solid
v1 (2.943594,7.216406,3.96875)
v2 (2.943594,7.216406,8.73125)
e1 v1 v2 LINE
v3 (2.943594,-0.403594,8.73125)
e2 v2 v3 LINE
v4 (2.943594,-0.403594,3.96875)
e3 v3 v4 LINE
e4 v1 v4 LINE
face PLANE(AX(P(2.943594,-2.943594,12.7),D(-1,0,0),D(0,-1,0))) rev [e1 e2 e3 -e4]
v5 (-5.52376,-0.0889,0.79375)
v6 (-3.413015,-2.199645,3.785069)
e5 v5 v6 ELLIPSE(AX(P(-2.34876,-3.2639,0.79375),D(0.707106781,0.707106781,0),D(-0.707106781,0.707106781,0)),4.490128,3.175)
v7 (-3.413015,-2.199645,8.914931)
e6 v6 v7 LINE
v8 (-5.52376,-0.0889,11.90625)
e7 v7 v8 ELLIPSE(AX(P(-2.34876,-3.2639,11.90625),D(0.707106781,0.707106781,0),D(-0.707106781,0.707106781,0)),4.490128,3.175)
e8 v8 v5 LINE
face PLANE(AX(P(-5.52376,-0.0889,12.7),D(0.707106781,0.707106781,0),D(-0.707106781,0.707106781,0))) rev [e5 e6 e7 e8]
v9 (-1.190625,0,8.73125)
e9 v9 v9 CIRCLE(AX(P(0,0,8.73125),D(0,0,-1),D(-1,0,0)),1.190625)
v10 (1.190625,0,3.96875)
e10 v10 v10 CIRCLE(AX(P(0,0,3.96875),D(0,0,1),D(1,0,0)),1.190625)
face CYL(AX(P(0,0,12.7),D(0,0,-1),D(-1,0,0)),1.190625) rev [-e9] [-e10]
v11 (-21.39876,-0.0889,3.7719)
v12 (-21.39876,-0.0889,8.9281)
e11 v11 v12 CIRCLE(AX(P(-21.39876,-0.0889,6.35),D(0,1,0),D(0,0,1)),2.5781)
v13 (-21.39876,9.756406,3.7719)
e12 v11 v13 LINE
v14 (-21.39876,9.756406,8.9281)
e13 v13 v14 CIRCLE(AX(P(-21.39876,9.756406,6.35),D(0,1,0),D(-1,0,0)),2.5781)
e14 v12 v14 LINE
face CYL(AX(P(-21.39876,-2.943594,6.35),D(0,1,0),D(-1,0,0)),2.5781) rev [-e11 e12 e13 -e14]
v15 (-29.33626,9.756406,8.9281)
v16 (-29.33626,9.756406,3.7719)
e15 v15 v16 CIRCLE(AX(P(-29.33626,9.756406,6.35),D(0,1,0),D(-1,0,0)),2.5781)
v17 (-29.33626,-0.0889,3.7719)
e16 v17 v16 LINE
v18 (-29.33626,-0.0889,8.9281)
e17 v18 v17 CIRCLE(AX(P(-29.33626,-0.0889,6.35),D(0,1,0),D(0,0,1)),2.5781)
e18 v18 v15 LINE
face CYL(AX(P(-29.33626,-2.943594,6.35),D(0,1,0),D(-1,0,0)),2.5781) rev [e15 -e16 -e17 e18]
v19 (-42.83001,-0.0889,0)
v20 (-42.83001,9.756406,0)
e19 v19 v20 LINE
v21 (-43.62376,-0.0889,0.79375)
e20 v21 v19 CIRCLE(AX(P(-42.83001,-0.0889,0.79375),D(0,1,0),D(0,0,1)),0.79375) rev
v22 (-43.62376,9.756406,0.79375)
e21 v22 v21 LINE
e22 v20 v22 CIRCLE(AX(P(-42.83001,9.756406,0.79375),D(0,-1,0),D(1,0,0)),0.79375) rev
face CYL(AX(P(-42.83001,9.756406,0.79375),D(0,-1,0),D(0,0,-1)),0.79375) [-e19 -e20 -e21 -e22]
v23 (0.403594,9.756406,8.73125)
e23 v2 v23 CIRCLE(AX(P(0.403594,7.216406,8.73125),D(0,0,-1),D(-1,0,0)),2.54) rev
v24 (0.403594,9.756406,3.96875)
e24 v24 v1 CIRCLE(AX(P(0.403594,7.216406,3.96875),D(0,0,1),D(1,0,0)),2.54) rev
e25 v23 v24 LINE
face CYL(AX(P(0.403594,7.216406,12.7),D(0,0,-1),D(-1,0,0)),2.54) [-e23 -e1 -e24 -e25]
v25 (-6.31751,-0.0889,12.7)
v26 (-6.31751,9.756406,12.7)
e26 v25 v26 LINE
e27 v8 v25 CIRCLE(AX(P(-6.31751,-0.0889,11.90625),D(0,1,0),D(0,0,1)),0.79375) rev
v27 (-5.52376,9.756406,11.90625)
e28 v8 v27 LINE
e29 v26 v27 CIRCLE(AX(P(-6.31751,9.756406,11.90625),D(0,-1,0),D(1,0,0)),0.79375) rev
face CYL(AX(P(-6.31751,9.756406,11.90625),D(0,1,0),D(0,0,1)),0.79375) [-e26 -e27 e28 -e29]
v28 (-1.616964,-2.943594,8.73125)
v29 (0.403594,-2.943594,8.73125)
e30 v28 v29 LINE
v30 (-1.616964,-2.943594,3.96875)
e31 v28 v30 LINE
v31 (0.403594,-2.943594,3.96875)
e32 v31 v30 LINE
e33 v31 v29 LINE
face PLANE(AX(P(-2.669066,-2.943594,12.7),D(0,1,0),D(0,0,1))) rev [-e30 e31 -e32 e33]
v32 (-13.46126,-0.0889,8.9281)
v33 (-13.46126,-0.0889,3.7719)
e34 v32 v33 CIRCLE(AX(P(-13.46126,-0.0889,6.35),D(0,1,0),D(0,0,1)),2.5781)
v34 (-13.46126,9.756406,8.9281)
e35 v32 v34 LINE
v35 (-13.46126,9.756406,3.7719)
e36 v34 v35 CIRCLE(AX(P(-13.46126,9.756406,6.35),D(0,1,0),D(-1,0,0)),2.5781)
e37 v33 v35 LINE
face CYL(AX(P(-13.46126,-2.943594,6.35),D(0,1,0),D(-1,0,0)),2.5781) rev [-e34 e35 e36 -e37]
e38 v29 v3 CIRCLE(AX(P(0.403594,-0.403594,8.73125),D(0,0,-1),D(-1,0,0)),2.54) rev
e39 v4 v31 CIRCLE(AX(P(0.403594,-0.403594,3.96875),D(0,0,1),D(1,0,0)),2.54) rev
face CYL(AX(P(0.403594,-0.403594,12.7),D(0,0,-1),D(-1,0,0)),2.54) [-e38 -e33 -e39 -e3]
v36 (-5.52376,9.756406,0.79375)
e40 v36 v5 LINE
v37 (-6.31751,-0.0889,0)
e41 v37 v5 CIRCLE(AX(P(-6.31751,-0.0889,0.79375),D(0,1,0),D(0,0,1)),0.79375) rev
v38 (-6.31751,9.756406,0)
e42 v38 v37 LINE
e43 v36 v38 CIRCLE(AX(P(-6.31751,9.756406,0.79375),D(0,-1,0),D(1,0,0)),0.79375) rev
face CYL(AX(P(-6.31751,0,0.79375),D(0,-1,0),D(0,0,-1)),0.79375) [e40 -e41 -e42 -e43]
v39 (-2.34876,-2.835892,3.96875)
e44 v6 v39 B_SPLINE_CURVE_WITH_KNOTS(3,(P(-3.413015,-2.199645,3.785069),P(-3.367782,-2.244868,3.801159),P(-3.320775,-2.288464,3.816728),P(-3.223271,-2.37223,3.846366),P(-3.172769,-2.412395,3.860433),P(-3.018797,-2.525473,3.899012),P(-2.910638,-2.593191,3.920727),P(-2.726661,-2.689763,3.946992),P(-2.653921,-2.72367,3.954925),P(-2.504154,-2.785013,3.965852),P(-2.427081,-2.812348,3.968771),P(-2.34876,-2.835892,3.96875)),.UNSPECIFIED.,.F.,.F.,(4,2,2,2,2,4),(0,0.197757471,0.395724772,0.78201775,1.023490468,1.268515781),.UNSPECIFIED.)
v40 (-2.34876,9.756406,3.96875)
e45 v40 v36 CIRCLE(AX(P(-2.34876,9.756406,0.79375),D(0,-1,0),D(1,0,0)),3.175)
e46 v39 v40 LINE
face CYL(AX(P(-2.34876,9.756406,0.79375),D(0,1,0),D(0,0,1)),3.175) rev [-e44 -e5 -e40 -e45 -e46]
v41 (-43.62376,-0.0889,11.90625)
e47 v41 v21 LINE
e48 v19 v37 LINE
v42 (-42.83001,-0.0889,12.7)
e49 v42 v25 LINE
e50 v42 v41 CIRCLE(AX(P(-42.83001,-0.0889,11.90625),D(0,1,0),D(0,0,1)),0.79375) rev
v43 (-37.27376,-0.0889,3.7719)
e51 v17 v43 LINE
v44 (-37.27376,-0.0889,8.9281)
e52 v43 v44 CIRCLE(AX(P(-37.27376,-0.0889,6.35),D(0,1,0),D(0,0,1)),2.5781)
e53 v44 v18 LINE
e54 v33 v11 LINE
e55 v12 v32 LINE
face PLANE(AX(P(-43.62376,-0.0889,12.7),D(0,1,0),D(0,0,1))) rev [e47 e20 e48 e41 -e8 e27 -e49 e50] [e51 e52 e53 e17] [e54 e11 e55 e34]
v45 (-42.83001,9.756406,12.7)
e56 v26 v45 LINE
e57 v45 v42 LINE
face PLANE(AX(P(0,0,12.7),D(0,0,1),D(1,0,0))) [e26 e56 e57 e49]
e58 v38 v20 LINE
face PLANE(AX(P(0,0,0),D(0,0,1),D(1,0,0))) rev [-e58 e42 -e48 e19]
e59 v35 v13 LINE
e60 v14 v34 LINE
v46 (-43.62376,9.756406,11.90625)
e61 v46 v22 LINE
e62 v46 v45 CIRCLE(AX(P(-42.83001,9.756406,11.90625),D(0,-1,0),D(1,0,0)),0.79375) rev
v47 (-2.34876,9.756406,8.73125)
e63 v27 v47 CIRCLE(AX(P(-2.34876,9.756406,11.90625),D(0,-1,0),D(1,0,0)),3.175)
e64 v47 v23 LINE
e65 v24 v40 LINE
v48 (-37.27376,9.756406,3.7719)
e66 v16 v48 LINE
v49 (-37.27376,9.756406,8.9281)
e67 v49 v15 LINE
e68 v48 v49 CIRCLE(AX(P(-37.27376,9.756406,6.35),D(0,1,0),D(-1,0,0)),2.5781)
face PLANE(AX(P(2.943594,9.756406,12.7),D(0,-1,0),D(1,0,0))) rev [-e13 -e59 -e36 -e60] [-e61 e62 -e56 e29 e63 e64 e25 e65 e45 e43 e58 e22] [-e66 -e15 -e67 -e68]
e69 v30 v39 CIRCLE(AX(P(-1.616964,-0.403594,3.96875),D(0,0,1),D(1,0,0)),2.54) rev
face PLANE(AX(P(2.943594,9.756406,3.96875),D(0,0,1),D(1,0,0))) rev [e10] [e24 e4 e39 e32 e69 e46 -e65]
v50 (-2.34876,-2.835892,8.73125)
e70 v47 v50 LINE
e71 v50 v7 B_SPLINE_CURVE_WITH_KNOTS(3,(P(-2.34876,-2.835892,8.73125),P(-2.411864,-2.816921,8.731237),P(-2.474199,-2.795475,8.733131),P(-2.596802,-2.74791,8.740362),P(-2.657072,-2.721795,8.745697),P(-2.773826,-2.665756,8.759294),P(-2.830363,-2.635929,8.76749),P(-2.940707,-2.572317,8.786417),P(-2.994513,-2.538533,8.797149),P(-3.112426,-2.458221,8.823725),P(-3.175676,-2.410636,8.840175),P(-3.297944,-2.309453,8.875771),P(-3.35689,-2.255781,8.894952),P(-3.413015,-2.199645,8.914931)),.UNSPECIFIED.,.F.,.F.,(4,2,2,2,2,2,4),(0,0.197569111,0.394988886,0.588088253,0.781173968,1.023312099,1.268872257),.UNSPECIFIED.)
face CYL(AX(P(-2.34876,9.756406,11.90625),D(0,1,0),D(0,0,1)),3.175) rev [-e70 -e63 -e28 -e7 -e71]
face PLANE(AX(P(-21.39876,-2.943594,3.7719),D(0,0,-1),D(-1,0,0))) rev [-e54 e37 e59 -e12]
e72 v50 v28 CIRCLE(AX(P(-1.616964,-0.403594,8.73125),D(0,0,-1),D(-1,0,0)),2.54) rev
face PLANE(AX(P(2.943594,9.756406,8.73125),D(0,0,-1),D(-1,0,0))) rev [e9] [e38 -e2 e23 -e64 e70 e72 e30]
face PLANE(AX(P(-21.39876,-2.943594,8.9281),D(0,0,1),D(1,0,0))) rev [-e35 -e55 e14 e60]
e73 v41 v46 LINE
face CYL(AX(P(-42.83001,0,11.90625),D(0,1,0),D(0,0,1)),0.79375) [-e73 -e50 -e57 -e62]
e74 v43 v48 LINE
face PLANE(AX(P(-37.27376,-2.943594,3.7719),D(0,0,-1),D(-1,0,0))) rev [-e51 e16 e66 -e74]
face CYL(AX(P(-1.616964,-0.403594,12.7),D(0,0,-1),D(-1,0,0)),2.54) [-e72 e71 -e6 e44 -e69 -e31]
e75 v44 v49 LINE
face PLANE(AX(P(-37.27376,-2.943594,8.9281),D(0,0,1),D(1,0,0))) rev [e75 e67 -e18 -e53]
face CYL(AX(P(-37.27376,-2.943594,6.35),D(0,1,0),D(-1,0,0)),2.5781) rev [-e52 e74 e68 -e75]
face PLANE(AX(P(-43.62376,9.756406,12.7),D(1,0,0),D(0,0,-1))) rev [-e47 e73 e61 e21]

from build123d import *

# Parameters (mm, degrees)
SKETCH1_R           = 1.190625
BOSS_EXTRUDE1_DEPTH = 12.7
SKETCH5_W           = 8.46735418
SKETCH5_H           = 3.96875
CUT_EXTRUDE2_DEPTH  = 48.176397098
FILLET1_R           = 2.54
FILLET2_START       = -2.835892255
FILLET2_DEPTH       = 12.592298151
FILLET2_2_DEPTH     = 13
CUT_EXTRUDE3_DEPTH  = 48.176397125
FILLET3_R           = 0.79375


with BuildPart() as part:
    # Sketch1 → Boss-Extrude1 (new body)
    with BuildSketch(Plane.XY):
        Polygon((2.943594104, -2.943594104), (2.943594104, 9.756405896), (-43.623760076, 9.756405896), (-43.623760076, -0.0889), (-5.523760076, -0.0889), (-2.669065971, -2.943594104), align=None)
        Circle(SKETCH1_R, mode=Mode.SUBTRACT)
    extrude(amount=BOSS_EXTRUDE1_DEPTH)

    # Sketch5 → Cut-Extrude2 (cut, through all)
    with BuildSketch(Plane.XZ.offset(2.943594104)):
        with Locations((-1.290082986, 10.715625)):
            Rectangle(SKETCH5_W, SKETCH5_H)
        with Locations((-1.290082986, 1.984375)):
            Rectangle(SKETCH5_W, SKETCH5_H)
    extrude(amount=-CUT_EXTRUDE2_DEPTH, mode=Mode.SUBTRACT)

    # Fillet1
    fillet1_edges = [part.edges().sort_by_distance(p)[0] for p in [
        (-2.669065971, -2.943594104, 6.35),
        (2.943594104, 9.756405896, 6.35),
        (2.943594104, -2.943594104, 6.35),
    ]]
    fillet(fillet1_edges, radius=FILLET1_R)

    # Fillet2: read off the stored shape, not the designer's step
    # Fillet2 outline → Fillet2 (add)
    with BuildSketch(Plane(origin=(0, 0, 0), x_dir=(1, 0, 0), z_dir=(0, 1, 0)).offset(FILLET2_START)):
        with BuildLine():
            ThreePointArc((-5.523760076, -11.90625), (-4.593824106, -9.66118597), (-2.348760076, -8.73125))
            Line((-2.348760076, -8.73125), (-5.523760076, -8.73125))
            Line((-5.523760076, -8.73125), (-5.523760076, -11.90625))
        make_face()
        with BuildLine():
            ThreePointArc((-2.348760076, -3.96875), (-4.593824106, -3.03881403), (-5.523760076, -0.79375))
            Line((-5.523760076, -0.79375), (-5.523760076, -3.96875))
            Line((-5.523760076, -3.96875), (-2.348760076, -3.96875))
        make_face()
    extrude(amount=FILLET2_DEPTH)

    # Fillet2 2 outline → Fillet2 2 (cut)
    with BuildSketch(Plane.XY):
        with BuildLine():
            ThreePointArc((-2.348760048, -2.835892163), (-2.92030771, -2.583707388), (-3.413014747, -2.199645328))
            Line((-3.413014747, -2.199645328), (-5.523760076, -0.0889))
            Line((-5.523760076, -0.0889), (-5.523760076, -2.835892255))
            Line((-5.523760076, -2.835892255), (-2.348760048, -2.835892163))
        make_face()
    extrude(amount=FILLET2_2_DEPTH, mode=Mode.SUBTRACT)

    # Sketch9 → Cut-Extrude3 (cut, through all)
    with BuildSketch(Plane(origin=(0, 9.756405896, 0), x_dir=(1, 0, 0), z_dir=(0, 1, 0))):
        with BuildLine():
            Line((-37.273760076, -3.7719), (-29.336260076, -3.7719))
            ThreePointArc((-29.336260076, -3.7719), (-26.758160076, -6.35), (-29.336260076, -8.9281))
            Line((-29.336260076, -8.9281), (-37.273760076, -8.9281))
            ThreePointArc((-37.273760076, -8.9281), (-39.851860076, -6.35), (-37.273760076, -3.7719))
        make_face()
        with BuildLine():
            Line((-21.398760076, -3.7719), (-13.461260076, -3.7719))
            ThreePointArc((-13.461260076, -3.7719), (-10.883160076, -6.35), (-13.461260076, -8.9281))
            Line((-13.461260076, -8.9281), (-21.398760076, -8.9281))
            ThreePointArc((-21.398760076, -8.9281), (-23.976860076, -6.35), (-21.398760076, -3.7719))
        make_face()
    extrude(amount=-CUT_EXTRUDE3_DEPTH, mode=Mode.SUBTRACT)

    # Fillet3
    fillet3_edges = [part.edges().sort_by_distance(p)[0] for p in [
        (-43.623760076, 4.833752948, 12.7),
        (-43.623760076, 4.833752948, 0),
        (-5.523760076, 4.833752948, 12.7),
        (-5.523760076, 4.833752948, 0),
    ]]
    fillet(fillet3_edges, radius=FILLET3_R - 0.0001)  # a hair under: the kernel refuses the full size


solid = part.part
